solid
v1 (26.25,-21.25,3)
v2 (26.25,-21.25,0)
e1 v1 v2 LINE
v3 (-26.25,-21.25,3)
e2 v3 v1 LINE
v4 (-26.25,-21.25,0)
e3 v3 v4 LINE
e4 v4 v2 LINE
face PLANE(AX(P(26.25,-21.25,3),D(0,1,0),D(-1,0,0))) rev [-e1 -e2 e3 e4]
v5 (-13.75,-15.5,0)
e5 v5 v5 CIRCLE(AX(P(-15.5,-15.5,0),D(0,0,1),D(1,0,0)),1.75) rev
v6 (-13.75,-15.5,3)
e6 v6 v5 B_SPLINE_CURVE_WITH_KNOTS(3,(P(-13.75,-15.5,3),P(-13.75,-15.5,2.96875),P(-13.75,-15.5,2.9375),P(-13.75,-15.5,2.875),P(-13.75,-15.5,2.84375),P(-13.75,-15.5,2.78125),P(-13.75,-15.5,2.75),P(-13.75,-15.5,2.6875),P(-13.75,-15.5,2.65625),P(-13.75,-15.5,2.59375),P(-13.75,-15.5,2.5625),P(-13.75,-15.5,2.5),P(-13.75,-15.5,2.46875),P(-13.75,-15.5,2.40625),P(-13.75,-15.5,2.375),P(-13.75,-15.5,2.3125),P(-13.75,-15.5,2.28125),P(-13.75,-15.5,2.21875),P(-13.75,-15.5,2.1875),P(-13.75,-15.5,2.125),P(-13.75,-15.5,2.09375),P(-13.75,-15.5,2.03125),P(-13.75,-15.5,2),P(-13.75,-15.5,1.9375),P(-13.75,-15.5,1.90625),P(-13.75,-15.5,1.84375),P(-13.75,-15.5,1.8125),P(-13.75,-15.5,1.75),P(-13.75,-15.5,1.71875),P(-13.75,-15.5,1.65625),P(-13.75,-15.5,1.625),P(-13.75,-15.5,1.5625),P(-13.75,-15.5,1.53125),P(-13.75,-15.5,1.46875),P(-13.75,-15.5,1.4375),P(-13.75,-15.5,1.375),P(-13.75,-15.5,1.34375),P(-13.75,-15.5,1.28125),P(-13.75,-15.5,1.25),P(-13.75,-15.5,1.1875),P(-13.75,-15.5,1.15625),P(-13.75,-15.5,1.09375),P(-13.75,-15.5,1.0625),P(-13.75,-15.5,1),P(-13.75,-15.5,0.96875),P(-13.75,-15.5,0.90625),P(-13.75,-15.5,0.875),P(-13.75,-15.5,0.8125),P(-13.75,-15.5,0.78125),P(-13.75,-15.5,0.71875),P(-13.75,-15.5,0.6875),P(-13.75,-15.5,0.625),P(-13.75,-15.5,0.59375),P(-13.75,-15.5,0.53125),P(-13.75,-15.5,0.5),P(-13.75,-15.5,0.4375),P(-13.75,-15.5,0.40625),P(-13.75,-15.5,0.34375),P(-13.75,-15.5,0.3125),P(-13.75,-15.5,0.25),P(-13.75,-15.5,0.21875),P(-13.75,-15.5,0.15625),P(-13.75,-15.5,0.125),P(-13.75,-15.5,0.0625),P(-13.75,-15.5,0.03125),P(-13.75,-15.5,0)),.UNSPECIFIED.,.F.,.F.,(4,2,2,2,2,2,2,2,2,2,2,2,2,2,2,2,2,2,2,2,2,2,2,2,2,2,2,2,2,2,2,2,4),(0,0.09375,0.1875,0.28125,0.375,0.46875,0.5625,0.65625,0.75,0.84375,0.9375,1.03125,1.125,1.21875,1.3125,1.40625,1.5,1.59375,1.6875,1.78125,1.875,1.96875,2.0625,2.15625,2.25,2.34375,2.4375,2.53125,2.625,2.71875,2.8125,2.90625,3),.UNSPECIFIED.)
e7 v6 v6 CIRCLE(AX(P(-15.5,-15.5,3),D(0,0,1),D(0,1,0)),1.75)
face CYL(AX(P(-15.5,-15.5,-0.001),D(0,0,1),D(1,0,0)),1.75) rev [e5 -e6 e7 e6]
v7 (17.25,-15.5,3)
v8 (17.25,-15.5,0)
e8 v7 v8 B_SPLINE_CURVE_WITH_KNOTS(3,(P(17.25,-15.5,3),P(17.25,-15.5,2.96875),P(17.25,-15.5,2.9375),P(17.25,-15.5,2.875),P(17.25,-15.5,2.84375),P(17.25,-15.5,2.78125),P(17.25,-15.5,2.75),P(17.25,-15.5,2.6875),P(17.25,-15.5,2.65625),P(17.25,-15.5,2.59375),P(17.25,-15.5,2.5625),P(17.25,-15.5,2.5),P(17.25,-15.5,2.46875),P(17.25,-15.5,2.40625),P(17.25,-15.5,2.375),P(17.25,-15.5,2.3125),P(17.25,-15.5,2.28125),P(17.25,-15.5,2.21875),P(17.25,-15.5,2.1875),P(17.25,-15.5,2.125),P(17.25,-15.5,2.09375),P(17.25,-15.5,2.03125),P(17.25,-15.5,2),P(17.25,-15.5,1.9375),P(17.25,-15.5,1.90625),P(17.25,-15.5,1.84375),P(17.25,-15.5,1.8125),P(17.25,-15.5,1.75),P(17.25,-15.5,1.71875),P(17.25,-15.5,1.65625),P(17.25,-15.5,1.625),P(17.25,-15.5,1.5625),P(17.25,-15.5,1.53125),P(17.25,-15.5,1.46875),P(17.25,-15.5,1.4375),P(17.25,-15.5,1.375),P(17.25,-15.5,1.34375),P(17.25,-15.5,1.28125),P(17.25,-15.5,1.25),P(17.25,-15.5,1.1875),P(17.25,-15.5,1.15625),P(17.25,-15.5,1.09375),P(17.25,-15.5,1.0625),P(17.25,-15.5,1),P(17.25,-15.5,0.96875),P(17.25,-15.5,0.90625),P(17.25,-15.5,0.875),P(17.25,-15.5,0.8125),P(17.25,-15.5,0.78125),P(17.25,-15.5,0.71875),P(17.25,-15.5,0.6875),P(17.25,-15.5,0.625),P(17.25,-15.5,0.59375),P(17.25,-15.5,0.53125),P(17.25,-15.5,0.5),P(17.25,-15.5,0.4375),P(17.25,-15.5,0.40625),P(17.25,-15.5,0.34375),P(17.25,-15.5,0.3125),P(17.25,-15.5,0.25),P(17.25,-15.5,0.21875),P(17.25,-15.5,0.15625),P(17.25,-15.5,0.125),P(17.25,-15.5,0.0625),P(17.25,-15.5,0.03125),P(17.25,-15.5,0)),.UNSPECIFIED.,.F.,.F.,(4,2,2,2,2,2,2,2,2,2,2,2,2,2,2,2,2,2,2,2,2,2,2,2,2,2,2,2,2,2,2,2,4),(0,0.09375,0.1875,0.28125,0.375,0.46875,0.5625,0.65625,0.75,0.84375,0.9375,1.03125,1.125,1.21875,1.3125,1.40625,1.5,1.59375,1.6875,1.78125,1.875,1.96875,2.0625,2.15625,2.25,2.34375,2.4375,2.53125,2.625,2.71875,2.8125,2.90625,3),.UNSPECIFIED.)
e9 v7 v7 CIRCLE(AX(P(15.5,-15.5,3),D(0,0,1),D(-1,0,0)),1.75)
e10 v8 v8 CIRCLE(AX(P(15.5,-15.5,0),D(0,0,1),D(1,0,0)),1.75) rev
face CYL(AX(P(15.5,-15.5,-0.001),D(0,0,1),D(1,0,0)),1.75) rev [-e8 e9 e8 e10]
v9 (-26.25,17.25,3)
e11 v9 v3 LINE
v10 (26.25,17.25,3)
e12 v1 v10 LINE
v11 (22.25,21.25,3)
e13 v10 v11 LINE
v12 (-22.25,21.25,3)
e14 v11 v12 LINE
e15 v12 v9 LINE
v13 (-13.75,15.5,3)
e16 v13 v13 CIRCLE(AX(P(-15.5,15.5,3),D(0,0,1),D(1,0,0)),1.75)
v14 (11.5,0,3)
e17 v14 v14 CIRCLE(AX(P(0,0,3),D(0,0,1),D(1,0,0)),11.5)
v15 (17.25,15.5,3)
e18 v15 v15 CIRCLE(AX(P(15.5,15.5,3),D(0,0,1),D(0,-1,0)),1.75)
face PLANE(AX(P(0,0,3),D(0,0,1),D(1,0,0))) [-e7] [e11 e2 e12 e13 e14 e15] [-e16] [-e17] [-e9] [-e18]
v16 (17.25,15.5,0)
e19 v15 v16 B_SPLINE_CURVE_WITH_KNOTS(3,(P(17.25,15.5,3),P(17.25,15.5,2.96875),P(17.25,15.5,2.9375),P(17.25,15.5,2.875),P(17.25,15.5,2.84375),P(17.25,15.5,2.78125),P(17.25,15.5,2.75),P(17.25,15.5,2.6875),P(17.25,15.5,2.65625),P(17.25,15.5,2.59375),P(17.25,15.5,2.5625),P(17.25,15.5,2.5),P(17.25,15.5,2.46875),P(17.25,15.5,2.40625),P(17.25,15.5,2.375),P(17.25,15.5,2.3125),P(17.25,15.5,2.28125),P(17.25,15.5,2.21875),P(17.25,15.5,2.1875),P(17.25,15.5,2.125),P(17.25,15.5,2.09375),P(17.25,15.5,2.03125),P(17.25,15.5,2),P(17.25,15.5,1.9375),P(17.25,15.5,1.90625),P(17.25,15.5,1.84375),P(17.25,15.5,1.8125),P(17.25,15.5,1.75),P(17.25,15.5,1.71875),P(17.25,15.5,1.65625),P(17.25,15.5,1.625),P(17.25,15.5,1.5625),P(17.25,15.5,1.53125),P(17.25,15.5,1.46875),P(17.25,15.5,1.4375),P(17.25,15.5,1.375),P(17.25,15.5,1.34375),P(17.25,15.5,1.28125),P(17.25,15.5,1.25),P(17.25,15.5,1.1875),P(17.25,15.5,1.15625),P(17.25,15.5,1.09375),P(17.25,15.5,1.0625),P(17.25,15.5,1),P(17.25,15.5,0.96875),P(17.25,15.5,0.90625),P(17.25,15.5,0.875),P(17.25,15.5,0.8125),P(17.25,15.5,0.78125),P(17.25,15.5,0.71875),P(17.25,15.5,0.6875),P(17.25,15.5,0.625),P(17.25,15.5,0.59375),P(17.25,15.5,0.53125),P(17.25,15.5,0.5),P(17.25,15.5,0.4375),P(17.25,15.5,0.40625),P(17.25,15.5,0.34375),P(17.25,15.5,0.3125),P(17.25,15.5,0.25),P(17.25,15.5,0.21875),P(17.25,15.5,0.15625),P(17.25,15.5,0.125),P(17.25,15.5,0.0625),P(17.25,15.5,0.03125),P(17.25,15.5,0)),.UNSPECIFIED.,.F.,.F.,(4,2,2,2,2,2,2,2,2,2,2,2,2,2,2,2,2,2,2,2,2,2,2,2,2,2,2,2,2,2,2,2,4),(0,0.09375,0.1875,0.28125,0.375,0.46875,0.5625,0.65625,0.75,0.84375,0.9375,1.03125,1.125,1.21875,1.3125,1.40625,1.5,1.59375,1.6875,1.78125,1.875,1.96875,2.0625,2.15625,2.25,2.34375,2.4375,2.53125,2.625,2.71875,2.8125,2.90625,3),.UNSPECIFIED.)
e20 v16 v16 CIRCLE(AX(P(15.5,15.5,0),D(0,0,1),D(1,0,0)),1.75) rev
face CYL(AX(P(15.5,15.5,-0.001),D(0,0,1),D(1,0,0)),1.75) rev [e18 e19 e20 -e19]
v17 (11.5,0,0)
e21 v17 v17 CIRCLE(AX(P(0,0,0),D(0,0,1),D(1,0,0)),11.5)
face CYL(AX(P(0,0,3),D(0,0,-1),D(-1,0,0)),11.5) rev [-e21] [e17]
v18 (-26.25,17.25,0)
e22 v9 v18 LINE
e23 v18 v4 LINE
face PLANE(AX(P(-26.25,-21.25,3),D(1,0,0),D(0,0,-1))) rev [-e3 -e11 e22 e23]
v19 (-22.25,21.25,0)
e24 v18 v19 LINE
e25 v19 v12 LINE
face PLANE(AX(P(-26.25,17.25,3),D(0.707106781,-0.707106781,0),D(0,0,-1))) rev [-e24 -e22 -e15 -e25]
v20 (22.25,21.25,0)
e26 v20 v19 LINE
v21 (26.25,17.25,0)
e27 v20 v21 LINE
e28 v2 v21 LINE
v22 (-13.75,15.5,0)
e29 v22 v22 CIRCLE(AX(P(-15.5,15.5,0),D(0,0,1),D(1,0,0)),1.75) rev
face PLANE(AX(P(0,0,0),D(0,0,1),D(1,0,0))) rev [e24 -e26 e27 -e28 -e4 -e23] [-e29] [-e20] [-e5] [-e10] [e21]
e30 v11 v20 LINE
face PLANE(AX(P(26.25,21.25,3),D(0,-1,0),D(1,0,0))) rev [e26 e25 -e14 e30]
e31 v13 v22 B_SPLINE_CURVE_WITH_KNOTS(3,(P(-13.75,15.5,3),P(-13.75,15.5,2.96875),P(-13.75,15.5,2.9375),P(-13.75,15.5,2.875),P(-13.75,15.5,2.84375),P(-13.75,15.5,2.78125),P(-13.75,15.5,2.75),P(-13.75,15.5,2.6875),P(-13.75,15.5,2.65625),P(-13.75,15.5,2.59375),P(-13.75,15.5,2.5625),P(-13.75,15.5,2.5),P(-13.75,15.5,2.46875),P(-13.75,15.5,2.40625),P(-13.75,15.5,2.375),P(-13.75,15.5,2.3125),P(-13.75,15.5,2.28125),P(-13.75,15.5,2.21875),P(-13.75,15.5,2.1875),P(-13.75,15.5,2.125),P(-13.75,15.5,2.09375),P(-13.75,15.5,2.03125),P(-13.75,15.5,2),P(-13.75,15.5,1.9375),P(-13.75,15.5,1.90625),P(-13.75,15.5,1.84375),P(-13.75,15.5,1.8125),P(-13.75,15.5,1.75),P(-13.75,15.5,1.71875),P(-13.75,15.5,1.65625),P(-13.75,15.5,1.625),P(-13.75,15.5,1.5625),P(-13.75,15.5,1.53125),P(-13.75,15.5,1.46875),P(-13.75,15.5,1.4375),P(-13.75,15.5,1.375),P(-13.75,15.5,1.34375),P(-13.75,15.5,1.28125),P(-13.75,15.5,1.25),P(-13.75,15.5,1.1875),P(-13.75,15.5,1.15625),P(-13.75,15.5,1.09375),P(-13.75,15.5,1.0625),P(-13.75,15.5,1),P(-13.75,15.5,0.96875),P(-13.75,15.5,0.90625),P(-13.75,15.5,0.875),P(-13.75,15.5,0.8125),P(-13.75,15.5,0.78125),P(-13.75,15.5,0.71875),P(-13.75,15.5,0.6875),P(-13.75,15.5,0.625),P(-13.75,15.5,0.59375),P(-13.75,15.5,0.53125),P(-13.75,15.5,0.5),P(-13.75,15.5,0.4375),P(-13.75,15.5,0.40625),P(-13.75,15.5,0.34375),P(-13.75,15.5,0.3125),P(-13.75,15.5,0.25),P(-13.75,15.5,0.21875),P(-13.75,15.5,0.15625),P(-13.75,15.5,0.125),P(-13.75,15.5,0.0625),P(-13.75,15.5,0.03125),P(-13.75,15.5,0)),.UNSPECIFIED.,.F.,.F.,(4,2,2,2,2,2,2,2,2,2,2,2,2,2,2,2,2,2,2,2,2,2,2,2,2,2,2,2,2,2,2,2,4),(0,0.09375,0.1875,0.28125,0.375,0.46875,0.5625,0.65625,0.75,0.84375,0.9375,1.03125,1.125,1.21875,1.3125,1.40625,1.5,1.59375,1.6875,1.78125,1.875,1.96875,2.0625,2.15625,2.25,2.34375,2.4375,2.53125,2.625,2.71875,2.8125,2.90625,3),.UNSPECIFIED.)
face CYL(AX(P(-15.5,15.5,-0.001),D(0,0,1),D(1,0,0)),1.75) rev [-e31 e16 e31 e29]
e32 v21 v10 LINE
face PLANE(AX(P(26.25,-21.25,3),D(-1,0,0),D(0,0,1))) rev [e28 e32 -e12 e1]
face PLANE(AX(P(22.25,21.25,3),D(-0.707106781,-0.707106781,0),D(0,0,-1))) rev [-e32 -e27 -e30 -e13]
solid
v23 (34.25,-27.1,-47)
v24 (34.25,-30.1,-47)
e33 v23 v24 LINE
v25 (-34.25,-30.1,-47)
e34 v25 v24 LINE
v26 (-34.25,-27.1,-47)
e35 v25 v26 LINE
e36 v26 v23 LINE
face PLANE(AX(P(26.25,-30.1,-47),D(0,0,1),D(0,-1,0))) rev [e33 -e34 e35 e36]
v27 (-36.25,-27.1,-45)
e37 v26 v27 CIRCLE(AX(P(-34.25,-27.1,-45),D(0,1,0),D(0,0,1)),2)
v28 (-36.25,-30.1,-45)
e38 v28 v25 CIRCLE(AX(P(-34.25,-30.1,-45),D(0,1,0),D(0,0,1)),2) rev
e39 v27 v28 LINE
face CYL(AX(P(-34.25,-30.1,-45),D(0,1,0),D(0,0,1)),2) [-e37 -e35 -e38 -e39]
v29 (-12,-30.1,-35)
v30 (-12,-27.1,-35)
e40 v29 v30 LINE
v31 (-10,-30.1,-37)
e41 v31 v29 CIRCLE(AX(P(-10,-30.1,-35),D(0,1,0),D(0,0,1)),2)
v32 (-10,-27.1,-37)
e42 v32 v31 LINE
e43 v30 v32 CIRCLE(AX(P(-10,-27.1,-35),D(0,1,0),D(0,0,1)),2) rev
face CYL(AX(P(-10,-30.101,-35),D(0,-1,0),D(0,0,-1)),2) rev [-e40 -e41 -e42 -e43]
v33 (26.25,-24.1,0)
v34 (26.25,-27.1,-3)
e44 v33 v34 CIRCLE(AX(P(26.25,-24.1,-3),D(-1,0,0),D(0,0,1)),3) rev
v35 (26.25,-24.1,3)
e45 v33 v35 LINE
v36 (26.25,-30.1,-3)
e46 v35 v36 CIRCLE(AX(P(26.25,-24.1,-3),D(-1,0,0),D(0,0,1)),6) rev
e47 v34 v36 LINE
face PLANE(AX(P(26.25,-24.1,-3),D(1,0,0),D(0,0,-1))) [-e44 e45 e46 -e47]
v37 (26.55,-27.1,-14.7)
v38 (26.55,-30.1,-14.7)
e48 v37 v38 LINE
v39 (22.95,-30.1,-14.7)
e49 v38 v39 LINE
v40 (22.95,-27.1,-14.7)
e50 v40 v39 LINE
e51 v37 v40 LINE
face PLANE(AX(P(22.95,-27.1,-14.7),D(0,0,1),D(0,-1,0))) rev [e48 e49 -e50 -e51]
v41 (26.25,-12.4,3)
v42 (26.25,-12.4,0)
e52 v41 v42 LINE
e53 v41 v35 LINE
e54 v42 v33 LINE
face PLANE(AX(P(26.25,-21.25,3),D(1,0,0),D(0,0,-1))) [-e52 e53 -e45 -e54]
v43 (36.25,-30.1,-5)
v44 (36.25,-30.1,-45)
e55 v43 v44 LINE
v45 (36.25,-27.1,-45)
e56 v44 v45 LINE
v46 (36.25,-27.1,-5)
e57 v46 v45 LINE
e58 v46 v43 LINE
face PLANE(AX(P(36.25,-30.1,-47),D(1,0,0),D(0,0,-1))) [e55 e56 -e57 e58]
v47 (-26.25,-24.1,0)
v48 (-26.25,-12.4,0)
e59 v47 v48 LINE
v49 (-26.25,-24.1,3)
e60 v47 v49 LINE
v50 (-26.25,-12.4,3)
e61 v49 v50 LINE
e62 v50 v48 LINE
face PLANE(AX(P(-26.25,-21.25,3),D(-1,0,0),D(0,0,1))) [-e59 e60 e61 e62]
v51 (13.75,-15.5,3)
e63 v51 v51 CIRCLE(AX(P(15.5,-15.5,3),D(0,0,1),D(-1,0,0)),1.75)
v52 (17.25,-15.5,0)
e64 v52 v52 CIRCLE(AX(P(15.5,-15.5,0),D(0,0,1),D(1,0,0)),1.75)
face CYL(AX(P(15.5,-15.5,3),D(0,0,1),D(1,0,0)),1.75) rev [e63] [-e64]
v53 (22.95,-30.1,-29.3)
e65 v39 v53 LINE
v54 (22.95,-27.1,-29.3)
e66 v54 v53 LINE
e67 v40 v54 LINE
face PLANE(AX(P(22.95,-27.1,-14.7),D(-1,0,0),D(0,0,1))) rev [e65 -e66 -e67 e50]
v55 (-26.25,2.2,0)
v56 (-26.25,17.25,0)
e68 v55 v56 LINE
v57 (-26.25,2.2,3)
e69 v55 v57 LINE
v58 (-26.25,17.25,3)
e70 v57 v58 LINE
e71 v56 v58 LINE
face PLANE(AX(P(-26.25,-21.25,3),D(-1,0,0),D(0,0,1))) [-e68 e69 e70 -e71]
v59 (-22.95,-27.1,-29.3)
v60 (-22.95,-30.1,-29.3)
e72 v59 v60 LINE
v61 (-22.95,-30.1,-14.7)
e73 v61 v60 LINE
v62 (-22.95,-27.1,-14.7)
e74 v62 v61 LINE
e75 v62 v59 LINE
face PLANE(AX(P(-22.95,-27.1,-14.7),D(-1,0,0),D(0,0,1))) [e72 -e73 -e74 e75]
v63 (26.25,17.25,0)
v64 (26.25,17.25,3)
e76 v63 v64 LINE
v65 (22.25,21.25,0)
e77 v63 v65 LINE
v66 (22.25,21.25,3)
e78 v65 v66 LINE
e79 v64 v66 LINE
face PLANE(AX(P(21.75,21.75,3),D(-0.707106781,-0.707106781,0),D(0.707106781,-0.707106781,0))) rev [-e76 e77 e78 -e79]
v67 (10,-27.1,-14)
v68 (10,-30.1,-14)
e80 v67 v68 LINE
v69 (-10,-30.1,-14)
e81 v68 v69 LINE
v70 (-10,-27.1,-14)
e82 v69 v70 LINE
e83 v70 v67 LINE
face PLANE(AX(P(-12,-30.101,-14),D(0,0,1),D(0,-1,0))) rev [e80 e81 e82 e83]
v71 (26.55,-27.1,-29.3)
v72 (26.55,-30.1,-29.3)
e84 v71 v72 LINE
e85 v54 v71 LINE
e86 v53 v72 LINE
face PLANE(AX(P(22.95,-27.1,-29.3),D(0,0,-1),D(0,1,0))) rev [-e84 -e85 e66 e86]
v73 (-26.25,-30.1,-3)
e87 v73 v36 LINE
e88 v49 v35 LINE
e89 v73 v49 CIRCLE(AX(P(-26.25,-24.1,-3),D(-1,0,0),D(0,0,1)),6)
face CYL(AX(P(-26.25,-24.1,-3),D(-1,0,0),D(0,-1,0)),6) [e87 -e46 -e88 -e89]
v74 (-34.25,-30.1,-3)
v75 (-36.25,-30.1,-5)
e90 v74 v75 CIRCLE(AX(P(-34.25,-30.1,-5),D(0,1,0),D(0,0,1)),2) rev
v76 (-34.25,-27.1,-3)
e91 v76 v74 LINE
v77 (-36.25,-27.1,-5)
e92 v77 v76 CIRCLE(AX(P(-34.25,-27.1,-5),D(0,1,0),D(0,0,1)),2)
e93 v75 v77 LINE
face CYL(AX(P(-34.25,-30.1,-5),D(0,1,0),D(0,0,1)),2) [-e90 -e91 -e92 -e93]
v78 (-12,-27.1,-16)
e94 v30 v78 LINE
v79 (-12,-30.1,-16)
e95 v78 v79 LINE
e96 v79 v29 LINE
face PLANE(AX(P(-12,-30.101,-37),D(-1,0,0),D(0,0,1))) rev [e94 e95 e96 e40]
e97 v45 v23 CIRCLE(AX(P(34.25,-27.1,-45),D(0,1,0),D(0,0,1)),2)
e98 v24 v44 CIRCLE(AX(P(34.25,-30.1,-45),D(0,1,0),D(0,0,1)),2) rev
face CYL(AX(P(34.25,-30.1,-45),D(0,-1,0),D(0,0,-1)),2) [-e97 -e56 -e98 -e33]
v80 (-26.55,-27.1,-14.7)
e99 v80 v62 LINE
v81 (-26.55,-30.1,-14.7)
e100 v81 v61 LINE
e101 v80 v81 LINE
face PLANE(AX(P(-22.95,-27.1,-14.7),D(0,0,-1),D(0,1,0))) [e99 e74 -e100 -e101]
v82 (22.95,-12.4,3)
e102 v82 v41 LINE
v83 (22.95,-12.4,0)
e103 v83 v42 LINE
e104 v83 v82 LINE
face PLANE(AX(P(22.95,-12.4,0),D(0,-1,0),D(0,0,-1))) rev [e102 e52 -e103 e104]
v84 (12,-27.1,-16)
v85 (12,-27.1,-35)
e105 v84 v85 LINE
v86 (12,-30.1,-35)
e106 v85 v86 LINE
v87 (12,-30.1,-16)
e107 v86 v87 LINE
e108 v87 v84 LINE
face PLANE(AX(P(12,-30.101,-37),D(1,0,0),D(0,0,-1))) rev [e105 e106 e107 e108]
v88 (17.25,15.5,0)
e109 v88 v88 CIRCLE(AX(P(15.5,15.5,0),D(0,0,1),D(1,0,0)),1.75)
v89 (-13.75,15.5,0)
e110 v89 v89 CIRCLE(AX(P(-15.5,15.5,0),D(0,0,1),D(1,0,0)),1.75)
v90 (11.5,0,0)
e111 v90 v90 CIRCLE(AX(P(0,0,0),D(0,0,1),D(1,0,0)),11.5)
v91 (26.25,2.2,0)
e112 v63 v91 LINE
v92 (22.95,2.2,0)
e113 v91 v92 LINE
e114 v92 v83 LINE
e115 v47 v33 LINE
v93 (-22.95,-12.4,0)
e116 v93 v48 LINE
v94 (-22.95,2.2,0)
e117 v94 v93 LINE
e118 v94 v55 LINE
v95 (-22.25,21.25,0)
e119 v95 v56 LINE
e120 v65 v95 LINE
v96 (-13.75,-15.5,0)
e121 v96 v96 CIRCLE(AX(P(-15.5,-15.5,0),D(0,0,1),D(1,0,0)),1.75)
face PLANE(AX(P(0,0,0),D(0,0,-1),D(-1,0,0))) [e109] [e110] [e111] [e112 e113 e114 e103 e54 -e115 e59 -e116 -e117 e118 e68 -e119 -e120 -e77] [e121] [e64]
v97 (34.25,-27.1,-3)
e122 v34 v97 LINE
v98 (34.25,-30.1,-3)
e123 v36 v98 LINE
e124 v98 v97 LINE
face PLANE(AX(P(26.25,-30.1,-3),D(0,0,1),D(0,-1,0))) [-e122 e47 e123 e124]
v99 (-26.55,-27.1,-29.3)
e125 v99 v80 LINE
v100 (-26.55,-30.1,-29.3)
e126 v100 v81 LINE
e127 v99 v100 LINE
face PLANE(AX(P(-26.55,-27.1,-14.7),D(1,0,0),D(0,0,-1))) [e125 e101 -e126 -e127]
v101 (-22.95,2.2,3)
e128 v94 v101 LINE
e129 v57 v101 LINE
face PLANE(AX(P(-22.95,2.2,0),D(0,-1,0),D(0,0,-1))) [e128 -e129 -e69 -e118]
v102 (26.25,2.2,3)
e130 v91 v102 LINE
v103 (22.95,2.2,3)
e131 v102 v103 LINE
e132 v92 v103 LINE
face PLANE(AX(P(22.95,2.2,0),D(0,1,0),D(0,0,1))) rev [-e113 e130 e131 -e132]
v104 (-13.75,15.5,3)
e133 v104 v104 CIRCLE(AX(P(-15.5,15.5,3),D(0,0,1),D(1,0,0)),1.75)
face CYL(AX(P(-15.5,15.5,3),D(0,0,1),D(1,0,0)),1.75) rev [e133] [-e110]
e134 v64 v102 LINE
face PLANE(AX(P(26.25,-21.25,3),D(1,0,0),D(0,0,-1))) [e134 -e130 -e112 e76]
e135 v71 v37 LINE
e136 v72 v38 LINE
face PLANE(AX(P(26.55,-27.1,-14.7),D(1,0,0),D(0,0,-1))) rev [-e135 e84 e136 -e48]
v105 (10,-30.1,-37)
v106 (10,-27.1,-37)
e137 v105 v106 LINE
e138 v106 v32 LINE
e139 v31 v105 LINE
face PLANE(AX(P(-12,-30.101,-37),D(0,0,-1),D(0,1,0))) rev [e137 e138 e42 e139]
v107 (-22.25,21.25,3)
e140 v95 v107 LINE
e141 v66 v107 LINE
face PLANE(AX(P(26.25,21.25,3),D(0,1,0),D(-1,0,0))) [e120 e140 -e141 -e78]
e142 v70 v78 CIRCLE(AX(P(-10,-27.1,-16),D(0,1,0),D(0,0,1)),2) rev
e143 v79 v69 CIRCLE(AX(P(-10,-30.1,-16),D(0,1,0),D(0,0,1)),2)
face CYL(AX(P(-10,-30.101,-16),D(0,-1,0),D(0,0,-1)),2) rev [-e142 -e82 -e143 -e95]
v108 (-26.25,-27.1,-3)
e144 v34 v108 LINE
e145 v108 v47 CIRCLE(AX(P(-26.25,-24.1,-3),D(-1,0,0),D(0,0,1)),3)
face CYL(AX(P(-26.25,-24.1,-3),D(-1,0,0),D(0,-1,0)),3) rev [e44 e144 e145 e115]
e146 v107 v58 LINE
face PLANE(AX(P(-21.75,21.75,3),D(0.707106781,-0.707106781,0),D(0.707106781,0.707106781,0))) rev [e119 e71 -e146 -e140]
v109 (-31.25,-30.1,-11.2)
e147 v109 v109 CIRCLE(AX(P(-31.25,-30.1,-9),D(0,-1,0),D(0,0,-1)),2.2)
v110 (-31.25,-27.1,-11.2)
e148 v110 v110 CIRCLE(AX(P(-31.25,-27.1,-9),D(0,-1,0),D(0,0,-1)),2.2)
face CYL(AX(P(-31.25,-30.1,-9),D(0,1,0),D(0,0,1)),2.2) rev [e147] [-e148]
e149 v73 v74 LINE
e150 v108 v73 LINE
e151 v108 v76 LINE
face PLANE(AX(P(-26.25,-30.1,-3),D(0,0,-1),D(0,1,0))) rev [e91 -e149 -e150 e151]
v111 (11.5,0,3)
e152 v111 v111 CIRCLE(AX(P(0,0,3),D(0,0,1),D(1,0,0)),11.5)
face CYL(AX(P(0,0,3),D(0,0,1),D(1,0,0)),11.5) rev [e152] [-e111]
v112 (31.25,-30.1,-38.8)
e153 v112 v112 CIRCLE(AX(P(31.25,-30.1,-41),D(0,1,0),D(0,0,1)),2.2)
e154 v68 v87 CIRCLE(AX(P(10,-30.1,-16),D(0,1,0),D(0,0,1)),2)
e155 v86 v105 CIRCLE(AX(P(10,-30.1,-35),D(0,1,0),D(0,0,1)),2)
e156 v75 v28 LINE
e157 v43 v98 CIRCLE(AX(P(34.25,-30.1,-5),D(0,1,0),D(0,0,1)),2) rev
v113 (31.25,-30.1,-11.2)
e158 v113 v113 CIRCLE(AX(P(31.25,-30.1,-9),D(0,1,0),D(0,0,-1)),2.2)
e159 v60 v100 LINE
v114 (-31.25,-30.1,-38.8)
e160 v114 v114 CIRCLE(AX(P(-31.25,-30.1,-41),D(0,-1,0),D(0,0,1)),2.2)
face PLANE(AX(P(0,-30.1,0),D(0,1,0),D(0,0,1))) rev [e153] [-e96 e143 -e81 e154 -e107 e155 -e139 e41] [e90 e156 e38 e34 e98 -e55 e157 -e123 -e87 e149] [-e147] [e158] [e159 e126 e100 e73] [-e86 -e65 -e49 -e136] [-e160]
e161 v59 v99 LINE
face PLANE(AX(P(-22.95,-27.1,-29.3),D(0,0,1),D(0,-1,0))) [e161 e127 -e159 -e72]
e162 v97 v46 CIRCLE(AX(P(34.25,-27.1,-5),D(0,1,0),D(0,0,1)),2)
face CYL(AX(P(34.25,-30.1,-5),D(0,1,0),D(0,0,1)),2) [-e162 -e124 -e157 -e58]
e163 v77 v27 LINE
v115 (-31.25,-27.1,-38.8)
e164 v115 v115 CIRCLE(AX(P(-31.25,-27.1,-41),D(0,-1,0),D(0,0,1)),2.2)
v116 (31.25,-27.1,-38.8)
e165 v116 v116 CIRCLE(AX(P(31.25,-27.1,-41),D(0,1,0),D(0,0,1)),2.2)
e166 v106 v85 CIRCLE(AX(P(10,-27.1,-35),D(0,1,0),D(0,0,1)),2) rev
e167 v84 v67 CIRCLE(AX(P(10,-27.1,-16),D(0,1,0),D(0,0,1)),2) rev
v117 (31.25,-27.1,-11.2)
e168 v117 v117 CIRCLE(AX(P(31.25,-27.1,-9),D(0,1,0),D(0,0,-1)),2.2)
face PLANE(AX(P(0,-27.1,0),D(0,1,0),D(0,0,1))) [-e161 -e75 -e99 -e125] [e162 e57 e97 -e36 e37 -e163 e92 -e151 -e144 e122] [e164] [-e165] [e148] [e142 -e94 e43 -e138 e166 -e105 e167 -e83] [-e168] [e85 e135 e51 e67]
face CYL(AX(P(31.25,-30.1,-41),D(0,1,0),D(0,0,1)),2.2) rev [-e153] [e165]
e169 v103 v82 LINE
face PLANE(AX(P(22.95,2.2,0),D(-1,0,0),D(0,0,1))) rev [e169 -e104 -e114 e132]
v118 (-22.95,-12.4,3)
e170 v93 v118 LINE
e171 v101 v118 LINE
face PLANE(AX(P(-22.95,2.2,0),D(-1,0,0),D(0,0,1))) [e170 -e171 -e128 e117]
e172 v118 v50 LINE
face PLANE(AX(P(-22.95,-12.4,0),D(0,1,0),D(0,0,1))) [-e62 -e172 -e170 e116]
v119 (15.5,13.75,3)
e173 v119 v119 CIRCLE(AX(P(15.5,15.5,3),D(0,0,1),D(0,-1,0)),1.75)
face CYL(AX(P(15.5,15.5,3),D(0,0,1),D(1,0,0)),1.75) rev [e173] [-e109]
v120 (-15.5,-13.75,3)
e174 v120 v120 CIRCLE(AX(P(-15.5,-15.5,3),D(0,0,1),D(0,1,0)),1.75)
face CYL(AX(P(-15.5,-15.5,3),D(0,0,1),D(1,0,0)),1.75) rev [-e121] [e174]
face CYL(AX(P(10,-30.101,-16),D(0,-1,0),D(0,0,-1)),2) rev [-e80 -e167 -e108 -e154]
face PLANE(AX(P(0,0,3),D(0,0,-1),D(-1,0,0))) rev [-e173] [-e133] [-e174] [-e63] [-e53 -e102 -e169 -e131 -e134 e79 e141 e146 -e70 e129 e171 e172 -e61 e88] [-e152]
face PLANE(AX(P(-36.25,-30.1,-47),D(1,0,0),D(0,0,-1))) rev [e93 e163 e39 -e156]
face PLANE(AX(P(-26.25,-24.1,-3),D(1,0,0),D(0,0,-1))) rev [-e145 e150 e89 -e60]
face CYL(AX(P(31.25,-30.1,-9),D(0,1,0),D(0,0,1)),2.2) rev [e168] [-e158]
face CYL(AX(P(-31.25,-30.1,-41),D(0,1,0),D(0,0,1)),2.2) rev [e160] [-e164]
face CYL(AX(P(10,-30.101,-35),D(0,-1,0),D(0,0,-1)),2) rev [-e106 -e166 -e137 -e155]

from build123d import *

# Parameters (mm, degrees)
SKETCH1_W                    = 52.5
SKETCH1_H                    = 42.5
SKETCH1_R                    = 11.5
BOSS_EXTRUDE1_DEPTH          = 3
CHAMFER1_SIZE                = 4
CUT_EXTRUDE1_REACH           = 35.906
SKETCH3_R                    = 1.75
CIRPATTERN1_COUNT            = 4
CONVERT_SOLID1_OUTLINE_R     = 1.75
CONVERT_SOLID1_OUTLINE_R_2   = 11.5
CONVERT_SOLID1_DEPTH         = 3
SKETCH4_W                    = 52.5
SKETCH4_H                    = 5.85
BASE_FLANGE1_DEPTH           = 3
EDGE_FLANGE1_STRIP_W         = 18
EDGE_FLANGE1_STRIP_H         = 3
EDGE_FLANGE1_STRIP_CUT_DEPTH = 52.5
EDGE_FLANGE1_DEPTH           = 52.5
SKETCH15_W                   = 24
SKETCH15_H                   = 23
CUT_EXTRUDE2_DEPTH           = 3
FILLET3_R                    = 2
SKETCH12_W                   = 10
SKETCH12_H                   = 44
SKETCH12_R                   = 2.2
TAB1_DEPTH                   = 3
FILLET1_R                    = 2
FILLET1_OF_MIRROR1_R         = 2
SKETCH16_W                   = 3.6
SKETCH16_H                   = 14.6
CUT_EXTRUDE3_DEPTH           = 10
SKETCH17_W                   = 3.6
SKETCH17_H                   = 14.6
CUT_EXTRUDE4_DEPTH           = 3


# Read off the part's stored shape, not the designer's step: Convert-Solid1
# Sheet-metal steps are written as plain solids
with BuildPart() as part:
    # Sketch1 → Boss-Extrude1 (new body)
    with BuildSketch(Plane.XY):
        Rectangle(SKETCH1_W, SKETCH1_H)
        Circle(SKETCH1_R, mode=Mode.SUBTRACT)
    extrude(amount=BOSS_EXTRUDE1_DEPTH)

    # Chamfer1
    chamfer1_edges = [part.edges().sort_by_distance(p)[0] for p in [
        (-26.25, 21.25, 1.5),
        (26.25, 21.25, 1.5),
    ]]
    chamfer(chamfer1_edges, length=CHAMFER1_SIZE)

    # Sketch3 → Cut-Extrude1 (cut, up to next)
    with BuildSketch(Plane.XY.offset(3), mode=Mode.PRIVATE) as cut_extrude1_sk1:
        with Locations((-15.5, 15.5)):
            Circle(SKETCH3_R)
    cut_extrude1_tool1 = extrude(cut_extrude1_sk1.sketch, amount=-CUT_EXTRUDE1_REACH, mode=Mode.PRIVATE) & part.part
    cut_extrude1 = cut_extrude1_tool1.solids().sort_by_distance((-15.5, 15.5, 3))[0]
    add(cut_extrude1, mode=Mode.SUBTRACT)

    # CirPattern1: Cut-Extrude1 ×4 about axis
    cirpattern1_axis = Axis((0, 0, 0), (0, 0, 1))
    for i in range(1, CIRPATTERN1_COUNT):
        add(cut_extrude1.rotate(cirpattern1_axis, i * 360 / CIRPATTERN1_COUNT), mode=Mode.SUBTRACT)


with BuildPart() as body_2:
    # Convert-Solid1 outline → Convert-Solid1 (new body)
    with BuildSketch(Plane.XY):
        Polygon((-22.25, 21.25), (-26.25, 17.25), (-26.25, -21.25), (26.25, -21.25), (26.25, 17.25), (22.25, 21.25), align=None)
        with Locations((-15.5, -15.5)):
            Circle(CONVERT_SOLID1_OUTLINE_R, mode=Mode.SUBTRACT)
        with Locations((15.5, -15.5)):
            Circle(CONVERT_SOLID1_OUTLINE_R, mode=Mode.SUBTRACT)
        with Locations((-15.5, 15.5)):
            Circle(CONVERT_SOLID1_OUTLINE_R, mode=Mode.SUBTRACT)
        Circle(CONVERT_SOLID1_OUTLINE_R_2, mode=Mode.SUBTRACT)
        with Locations((15.5, 15.5)):
            Circle(CONVERT_SOLID1_OUTLINE_R, mode=Mode.SUBTRACT)
    extrude(amount=CONVERT_SOLID1_DEPTH)


with BuildPart() as body_3:
    # Sketch4 → Base-Flange1 (new body)
    with BuildSketch(Plane(origin=(0, 0, 0), x_dir=(-1, 0, 0), z_dir=(0, 0, -1))):
        with Locations((0, -24.175)):
            Rectangle(SKETCH4_W, SKETCH4_H)
    extrude(amount=-BASE_FLANGE1_DEPTH)

    # Combine1: union body 2
    add(body_2.part)

    # Edge-Flange1 strip (across the edge) → Edge-Flange1 strip cut (cut)
    with BuildSketch(Plane(origin=(26.25, -27.1, 0), x_dir=(0, 1, 0), z_dir=(-1, 0, 0))):
        with Locations((-6, -1.5)):
            Rectangle(EDGE_FLANGE1_STRIP_W, EDGE_FLANGE1_STRIP_H)
    extrude(amount=EDGE_FLANGE1_STRIP_CUT_DEPTH, mode=Mode.SUBTRACT)

    # Edge-Flange1 section (across the edge) → Edge-Flange1 (add)
    with BuildSketch(Plane(origin=(26.25, -27.1, 0), x_dir=(0, 1, 0), z_dir=(-1, 0, 0))):
        with BuildLine():
            Line((-3, 3), (-3, 47))
            Line((-3, 47), (0, 47))
            Line((0, 47), (0, 3))
            ThreePointArc((0, 3), (0.878679656, 0.878679656), (3, 0))
            Line((3, 0), (3, -3))
            ThreePointArc((3, -3), (-1.242640687, -1.242640687), (-3, 3))
        make_face()
    extrude(amount=EDGE_FLANGE1_DEPTH)

    # Sketch15 → Cut-Extrude2 (cut)
    with BuildSketch(Plane(origin=(0, -27.1, 0), x_dir=(1, 0, 0), z_dir=(0, 1, 0))):
        with Locations((0, 25.5)):
            Rectangle(SKETCH15_W, SKETCH15_H)
    extrude(amount=-CUT_EXTRUDE2_DEPTH, mode=Mode.SUBTRACT)

    # Fillet3
    fillet3_edges = [body_3.edges().sort_by_distance(p)[0] for p in [
        (-12, -28.6, -14),
        (-12, -28.6, -37),
        (12, -28.6, -37),
        (12, -28.6, -14),
    ]]
    fillet(fillet3_edges, radius=FILLET3_R)

    # Sketch12 → Tab1 (add)
    with BuildSketch(Plane(origin=(0, -27.1, 0), x_dir=(1, 0, 0), z_dir=(0, 1, 0))):
        with Locations((31.25, 25)):
            Rectangle(SKETCH12_W, SKETCH12_H)
        with Locations(Location((31.25, 41, 0), (0, 0, 270))):
            Circle(SKETCH12_R, mode=Mode.SUBTRACT)
        with Locations(Location((31.25, 9, 0), (0, 0, 90))):
            Circle(SKETCH12_R, mode=Mode.SUBTRACT)
    tab1 = extrude(amount=-TAB1_DEPTH)

    # Fillet1
    fillet1_edges = [body_3.edges().sort_by_distance(p)[0] for p in [
        (36.25, -28.6, -47),
        (36.25, -28.6, -3),
    ]]
    fillet(fillet1_edges, radius=FILLET1_R)

    # Mirror1: Tab1 across plane
    add(tab1.mirror(Plane(origin=(0, 0, 0), x_dir=(0, 0, 1), z_dir=(1, 0, 0))))

    # Fillet1 of Mirror1
    fillet1_of_mirror1_edges = [body_3.edges().sort_by_distance(p)[0] for p in [
        (-36.25, -28.6, -47),
        (-36.25, -28.6, -3),
    ]]
    fillet(fillet1_of_mirror1_edges, radius=FILLET1_OF_MIRROR1_R)

    # Sketch16 → Cut-Extrude3 (cut)
    with BuildSketch(Plane.XY.offset(3)):
        with Locations((24.75, -5.1)):
            Rectangle(SKETCH16_W, SKETCH16_H)
    cut_extrude3 = extrude(amount=-CUT_EXTRUDE3_DEPTH, mode=Mode.SUBTRACT)

    # Mirror2: Cut-Extrude3 across plane
    add(cut_extrude3.mirror(Plane(origin=(0, 0, 0), x_dir=(0, 0, 1), z_dir=(1, 0, 0))), mode=Mode.SUBTRACT)

    # Sketch17 → Cut-Extrude4 (cut)
    with BuildSketch(Plane.XZ.offset(30.1)):
        with Locations((24.75, -22)):
            Rectangle(SKETCH17_W, SKETCH17_H)
    cut_extrude4 = extrude(amount=-CUT_EXTRUDE4_DEPTH, mode=Mode.SUBTRACT)

    # Mirror3: Cut-Extrude4 across plane
    add(cut_extrude4.mirror(Plane(origin=(0, 0, 0), x_dir=(0, 0, 1), z_dir=(1, 0, 0))), mode=Mode.SUBTRACT)


solid = Compound([part.part, body_3.part])
